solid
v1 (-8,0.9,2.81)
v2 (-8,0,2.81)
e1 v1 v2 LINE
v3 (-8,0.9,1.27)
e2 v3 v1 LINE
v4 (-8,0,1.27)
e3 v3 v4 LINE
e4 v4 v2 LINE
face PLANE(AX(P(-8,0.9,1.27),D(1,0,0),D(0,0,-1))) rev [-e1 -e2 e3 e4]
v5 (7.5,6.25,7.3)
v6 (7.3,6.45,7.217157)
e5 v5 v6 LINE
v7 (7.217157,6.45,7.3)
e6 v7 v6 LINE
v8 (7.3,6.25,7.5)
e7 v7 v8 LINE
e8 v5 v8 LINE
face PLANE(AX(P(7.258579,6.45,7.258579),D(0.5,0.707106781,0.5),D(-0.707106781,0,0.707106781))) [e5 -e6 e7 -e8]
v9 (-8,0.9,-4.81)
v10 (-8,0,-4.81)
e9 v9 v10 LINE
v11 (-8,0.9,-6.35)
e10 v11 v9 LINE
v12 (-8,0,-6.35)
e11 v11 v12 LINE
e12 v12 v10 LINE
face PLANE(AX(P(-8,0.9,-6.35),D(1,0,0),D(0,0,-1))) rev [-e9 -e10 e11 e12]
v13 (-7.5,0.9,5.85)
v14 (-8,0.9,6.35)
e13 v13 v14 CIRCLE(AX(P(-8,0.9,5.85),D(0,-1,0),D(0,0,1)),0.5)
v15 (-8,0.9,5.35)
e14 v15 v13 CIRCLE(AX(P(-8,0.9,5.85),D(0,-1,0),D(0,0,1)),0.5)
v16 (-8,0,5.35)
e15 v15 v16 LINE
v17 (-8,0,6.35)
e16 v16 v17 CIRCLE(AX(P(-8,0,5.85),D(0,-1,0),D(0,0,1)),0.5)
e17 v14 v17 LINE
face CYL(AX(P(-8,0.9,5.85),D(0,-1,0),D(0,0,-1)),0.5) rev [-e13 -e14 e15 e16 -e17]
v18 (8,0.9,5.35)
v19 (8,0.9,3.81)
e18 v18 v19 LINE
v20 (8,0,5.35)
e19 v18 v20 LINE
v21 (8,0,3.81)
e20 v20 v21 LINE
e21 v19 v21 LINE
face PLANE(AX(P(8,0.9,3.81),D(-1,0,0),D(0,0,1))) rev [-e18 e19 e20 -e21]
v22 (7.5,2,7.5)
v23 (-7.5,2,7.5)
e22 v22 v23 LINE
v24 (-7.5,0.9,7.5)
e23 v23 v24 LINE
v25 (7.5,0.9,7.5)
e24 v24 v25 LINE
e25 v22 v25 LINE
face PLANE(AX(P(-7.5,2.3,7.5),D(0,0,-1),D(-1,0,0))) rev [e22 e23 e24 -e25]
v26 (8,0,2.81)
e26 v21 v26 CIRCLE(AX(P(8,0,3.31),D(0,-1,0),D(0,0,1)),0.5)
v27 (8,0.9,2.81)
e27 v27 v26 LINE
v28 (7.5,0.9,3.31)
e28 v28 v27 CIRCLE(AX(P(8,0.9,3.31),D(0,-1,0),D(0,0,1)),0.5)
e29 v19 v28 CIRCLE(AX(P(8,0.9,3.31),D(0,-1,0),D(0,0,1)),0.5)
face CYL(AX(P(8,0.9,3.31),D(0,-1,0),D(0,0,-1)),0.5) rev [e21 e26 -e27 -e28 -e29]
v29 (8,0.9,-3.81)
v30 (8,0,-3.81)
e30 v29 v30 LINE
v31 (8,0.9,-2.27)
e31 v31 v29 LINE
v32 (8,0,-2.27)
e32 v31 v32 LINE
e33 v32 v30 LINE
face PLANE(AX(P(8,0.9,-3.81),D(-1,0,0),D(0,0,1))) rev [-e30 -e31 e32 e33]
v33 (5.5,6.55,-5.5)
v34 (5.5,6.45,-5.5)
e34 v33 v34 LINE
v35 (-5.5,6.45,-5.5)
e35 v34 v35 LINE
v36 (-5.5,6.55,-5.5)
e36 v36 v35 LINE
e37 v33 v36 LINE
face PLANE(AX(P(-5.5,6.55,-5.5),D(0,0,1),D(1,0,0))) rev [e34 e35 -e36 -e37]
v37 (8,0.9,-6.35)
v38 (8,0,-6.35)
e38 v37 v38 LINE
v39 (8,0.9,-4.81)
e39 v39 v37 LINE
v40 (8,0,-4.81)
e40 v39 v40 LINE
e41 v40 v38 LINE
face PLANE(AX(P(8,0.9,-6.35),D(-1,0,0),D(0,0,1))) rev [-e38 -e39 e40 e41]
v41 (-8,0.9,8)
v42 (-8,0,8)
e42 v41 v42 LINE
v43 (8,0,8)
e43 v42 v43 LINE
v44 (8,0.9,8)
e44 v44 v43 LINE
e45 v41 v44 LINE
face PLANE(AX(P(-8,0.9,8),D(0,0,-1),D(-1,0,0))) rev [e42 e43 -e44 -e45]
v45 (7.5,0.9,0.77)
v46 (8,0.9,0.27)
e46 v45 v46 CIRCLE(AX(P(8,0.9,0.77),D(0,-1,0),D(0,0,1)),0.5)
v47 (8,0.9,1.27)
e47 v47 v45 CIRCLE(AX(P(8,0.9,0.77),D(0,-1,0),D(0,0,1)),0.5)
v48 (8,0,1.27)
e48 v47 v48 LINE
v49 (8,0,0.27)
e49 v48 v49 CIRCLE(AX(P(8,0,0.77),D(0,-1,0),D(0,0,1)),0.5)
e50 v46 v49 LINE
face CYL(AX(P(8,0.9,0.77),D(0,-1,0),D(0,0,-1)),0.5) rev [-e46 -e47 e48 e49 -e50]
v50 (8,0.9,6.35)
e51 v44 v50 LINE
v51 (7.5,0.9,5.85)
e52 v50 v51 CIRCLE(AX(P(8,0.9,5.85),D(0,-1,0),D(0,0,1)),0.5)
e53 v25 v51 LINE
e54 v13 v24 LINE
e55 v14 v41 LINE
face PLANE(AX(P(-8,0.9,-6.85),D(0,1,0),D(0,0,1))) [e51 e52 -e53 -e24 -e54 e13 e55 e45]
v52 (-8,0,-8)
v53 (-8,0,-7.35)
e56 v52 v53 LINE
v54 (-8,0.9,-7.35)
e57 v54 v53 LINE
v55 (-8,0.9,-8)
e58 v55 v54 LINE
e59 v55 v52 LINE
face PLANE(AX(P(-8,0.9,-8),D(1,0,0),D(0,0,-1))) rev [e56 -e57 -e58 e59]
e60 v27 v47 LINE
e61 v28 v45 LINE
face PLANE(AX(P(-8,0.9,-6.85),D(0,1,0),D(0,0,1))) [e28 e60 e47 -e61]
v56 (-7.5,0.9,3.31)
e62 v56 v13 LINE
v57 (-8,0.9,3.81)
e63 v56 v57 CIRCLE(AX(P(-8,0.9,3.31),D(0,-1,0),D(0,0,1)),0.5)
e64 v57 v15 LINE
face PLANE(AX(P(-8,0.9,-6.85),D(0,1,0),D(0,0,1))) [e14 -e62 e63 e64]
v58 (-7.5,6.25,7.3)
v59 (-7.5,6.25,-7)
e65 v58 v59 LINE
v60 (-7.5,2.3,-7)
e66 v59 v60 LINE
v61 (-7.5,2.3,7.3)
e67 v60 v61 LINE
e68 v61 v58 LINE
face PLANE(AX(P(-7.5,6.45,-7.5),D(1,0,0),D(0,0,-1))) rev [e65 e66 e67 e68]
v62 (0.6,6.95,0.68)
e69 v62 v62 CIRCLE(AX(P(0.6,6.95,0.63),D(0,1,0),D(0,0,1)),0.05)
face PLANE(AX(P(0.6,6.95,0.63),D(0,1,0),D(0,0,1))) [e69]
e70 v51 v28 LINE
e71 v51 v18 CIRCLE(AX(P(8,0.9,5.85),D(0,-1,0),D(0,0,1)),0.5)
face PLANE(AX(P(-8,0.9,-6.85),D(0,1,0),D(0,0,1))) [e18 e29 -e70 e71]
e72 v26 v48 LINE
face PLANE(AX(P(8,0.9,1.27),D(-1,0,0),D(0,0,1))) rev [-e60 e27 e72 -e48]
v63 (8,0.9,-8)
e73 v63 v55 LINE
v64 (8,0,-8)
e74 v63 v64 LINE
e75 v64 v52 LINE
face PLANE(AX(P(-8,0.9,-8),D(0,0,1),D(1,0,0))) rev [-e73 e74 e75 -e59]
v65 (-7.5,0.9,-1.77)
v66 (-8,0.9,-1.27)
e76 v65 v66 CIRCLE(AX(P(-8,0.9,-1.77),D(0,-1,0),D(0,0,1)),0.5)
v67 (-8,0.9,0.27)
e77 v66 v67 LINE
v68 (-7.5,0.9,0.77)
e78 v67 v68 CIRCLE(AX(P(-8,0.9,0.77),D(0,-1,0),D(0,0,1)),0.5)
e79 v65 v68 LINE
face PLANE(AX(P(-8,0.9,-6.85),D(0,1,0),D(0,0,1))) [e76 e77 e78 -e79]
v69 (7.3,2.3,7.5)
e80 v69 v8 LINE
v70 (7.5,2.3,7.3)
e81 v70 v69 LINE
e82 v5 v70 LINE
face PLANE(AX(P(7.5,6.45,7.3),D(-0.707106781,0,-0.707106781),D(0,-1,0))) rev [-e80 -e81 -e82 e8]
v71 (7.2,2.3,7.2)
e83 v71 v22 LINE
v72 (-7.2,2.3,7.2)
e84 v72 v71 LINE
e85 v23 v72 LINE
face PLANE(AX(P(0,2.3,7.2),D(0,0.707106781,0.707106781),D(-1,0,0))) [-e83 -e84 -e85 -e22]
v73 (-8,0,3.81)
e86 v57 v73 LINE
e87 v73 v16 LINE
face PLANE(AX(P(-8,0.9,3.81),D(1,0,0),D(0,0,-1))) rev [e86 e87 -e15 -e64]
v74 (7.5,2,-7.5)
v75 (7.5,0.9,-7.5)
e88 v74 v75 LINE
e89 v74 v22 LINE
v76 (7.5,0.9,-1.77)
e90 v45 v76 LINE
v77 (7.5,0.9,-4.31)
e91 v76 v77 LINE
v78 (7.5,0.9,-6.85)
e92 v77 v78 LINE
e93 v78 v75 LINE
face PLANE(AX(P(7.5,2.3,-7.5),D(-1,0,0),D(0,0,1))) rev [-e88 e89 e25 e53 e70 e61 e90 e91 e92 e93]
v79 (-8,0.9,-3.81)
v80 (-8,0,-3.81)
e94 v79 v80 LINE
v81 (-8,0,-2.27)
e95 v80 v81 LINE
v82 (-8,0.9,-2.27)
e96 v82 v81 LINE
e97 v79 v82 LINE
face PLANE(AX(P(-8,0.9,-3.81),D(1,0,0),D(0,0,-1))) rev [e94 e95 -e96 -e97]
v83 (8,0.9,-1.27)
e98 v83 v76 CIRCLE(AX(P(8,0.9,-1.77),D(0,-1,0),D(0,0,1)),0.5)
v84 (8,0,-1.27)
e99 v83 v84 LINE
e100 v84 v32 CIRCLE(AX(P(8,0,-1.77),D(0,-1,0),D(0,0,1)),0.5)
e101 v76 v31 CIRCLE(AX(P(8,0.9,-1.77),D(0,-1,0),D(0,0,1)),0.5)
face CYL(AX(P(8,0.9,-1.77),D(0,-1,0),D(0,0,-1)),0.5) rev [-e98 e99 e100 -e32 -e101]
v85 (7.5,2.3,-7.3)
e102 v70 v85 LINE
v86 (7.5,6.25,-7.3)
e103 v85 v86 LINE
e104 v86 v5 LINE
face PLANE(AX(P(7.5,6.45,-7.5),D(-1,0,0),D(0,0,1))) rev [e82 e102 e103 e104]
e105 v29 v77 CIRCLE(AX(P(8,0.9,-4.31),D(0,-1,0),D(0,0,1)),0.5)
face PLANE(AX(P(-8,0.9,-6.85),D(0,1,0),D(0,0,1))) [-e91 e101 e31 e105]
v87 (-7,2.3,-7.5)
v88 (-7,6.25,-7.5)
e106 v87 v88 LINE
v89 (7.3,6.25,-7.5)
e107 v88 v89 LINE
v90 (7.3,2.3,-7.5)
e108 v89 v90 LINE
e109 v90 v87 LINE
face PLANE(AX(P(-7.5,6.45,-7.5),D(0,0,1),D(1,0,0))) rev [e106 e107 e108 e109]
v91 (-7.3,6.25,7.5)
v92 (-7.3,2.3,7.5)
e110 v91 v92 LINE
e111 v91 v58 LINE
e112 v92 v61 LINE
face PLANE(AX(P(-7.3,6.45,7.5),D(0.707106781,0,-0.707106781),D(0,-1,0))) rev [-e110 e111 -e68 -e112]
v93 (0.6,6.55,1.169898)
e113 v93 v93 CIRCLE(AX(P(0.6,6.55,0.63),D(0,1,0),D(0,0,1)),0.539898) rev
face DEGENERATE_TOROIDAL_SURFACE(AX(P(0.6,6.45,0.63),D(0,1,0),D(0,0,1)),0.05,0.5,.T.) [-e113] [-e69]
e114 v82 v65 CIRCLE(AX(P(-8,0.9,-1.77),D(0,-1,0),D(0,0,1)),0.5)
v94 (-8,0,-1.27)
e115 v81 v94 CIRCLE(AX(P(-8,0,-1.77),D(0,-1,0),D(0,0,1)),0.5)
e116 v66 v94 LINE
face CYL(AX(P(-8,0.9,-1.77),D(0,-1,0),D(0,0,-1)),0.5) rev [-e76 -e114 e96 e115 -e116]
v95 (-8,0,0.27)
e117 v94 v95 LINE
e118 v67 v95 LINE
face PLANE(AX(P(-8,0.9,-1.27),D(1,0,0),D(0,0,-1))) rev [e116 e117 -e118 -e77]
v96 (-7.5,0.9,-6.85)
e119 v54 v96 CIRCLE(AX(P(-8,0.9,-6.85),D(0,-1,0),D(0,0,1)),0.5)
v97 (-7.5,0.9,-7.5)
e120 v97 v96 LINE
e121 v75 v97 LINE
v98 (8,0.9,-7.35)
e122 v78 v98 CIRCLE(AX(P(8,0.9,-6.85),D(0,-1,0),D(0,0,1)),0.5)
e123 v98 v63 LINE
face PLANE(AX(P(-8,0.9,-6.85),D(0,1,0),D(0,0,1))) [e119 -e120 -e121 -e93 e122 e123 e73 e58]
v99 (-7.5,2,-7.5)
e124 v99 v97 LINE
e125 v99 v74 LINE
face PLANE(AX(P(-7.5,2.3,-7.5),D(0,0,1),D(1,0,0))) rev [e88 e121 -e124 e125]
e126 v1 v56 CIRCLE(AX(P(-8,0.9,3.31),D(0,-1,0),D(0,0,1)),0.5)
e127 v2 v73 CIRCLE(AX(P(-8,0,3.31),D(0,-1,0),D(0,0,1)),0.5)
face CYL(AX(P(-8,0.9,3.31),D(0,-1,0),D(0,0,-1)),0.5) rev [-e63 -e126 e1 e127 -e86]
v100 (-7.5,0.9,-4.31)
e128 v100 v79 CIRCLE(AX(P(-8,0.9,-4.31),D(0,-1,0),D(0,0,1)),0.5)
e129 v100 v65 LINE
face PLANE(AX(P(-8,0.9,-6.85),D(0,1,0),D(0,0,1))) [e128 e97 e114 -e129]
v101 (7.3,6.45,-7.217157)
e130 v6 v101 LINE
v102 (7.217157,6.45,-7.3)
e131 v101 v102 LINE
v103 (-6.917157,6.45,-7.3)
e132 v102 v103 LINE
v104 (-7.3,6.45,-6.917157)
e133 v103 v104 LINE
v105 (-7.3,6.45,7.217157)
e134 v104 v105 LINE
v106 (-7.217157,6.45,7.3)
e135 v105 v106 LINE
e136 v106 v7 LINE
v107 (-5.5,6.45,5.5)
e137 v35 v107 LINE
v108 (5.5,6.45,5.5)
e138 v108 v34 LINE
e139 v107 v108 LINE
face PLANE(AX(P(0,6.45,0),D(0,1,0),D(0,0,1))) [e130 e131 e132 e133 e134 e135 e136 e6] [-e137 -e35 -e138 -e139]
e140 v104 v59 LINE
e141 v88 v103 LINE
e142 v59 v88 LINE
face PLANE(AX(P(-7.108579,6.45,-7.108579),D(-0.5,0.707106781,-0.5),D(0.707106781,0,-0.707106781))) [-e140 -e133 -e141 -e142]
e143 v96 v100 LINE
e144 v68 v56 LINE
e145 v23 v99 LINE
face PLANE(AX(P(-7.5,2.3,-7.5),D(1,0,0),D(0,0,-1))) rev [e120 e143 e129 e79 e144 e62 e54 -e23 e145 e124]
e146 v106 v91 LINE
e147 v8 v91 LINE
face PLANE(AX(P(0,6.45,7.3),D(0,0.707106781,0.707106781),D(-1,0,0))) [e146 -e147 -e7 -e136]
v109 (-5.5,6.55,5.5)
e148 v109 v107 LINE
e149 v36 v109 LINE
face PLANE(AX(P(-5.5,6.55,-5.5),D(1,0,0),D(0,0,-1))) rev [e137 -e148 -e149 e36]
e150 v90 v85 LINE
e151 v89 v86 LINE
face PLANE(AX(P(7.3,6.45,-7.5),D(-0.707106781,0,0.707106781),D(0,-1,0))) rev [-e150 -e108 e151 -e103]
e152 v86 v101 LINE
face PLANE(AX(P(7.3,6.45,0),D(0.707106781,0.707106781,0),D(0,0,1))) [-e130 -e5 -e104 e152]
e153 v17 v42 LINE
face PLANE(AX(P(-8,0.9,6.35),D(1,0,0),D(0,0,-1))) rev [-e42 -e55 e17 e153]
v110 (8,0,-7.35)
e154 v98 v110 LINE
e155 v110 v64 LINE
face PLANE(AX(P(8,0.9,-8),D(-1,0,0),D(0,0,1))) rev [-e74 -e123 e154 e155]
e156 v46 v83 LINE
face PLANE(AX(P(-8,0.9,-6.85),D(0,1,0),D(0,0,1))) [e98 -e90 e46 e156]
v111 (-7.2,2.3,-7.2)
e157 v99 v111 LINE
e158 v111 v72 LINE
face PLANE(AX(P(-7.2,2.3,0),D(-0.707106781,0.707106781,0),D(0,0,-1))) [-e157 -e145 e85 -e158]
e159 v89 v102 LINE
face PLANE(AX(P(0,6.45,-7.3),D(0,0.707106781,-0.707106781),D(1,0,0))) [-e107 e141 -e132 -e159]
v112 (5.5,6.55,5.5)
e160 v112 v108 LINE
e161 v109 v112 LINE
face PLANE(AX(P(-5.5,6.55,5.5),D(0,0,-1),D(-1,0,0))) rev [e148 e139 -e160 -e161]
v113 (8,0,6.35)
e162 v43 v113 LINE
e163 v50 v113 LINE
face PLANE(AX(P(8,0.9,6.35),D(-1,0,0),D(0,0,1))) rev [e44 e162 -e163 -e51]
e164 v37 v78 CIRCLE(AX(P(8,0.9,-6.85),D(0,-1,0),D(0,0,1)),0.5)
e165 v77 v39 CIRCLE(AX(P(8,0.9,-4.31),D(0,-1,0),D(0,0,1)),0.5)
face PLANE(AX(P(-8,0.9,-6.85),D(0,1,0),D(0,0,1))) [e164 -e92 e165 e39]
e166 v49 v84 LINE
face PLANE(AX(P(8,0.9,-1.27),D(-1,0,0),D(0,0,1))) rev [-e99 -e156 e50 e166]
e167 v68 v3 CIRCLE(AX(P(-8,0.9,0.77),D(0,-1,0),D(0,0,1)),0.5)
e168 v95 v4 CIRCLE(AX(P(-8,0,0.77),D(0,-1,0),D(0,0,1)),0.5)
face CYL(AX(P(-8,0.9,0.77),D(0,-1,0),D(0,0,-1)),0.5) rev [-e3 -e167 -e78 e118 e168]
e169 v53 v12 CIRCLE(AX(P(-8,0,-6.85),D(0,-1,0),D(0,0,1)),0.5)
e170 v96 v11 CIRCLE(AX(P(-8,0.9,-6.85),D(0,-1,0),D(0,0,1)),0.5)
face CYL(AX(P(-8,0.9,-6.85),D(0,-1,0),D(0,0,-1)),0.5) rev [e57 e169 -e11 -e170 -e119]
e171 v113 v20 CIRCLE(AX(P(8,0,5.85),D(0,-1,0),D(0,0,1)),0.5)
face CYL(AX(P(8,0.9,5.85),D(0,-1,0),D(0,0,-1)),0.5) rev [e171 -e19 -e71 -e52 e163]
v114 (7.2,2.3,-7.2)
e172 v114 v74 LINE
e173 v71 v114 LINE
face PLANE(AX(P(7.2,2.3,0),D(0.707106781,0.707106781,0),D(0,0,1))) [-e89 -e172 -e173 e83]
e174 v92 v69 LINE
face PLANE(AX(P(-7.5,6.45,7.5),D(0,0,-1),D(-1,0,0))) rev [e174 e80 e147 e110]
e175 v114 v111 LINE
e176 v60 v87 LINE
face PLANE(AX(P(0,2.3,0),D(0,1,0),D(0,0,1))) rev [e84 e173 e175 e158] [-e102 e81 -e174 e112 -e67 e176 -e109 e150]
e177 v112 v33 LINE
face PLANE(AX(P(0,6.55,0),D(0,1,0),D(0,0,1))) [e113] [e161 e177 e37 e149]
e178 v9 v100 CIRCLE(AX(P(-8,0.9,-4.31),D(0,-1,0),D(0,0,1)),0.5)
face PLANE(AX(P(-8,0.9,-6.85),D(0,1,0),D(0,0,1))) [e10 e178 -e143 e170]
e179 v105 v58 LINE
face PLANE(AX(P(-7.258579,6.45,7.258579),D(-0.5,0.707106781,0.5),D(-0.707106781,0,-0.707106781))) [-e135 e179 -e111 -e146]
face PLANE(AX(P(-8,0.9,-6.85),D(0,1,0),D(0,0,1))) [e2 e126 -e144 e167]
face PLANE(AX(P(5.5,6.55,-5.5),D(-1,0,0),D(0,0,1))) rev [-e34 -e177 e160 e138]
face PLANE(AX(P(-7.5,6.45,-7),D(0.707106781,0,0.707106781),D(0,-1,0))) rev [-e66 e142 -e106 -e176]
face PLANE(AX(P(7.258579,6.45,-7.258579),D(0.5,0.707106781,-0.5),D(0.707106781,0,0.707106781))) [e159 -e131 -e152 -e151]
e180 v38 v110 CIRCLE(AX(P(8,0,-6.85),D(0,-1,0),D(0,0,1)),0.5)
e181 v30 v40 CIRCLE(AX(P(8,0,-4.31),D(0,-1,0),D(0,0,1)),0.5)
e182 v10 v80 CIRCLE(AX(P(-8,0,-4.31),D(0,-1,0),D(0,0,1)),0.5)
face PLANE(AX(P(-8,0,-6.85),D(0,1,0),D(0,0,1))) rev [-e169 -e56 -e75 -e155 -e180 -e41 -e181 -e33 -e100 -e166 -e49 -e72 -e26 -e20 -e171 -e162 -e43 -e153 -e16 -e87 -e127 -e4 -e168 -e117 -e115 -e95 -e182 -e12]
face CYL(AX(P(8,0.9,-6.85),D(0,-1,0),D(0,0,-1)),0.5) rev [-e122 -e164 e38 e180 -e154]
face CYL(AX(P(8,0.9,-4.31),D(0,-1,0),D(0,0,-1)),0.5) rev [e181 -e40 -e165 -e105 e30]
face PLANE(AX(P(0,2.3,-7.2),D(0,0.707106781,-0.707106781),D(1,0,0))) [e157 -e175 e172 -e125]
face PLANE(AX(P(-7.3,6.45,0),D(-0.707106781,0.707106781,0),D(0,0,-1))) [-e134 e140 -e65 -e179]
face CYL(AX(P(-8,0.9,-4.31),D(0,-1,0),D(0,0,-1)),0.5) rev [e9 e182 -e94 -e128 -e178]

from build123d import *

# Parameters (mm, degrees)
EXTRUDE1_DEPTH = 0.9
SKETCH2_W      = 15
SKETCH2_H      = 15
EXTRUDE2_DEPTH = 1.4
CHAMFER1_SIZE  = 0.3
SKETCH3_W      = 15
SKETCH3_H      = 15
EXTRUDE3_DEPTH = 4.15
CHAMFER2_SIZE  = 0.5
CHAMFER3_SIZE  = 0.2
CHAMFER4_SIZE  = 0.2
SKETCH4_R      = 0.55
EXTRUDE4_DEPTH = 0.5
FILLET1_R      = 0.5
SKETCH5_W      = 11
SKETCH5_H      = 11
EXTRUDE5_DEPTH = 0.1


with BuildPart() as part:
    # Sketch1 → Extrude1 (new body)
    with BuildSketch(Plane(origin=(0, 0, 0), x_dir=(1, 0, 0), z_dir=(0, 1, 0))):
        with BuildLine():
            Line((8, 6.35), (8, 4.81))
            ThreePointArc((8, 4.81), (7.5, 4.31), (8, 3.81))
            Line((8, 3.81), (8, 2.27))
            ThreePointArc((8, 2.27), (7.5, 1.77), (8, 1.27))
            Line((8, 1.27), (8, -0.27))
            ThreePointArc((8, -0.27), (7.5, -0.77), (8, -1.27))
            Line((8, -1.27), (8, -2.81))
            ThreePointArc((8, -2.81), (7.5, -3.31), (8, -3.81))
            Line((8, -3.81), (8, -5.35))
            ThreePointArc((8, -5.35), (7.5, -5.85), (8, -6.35))
            Line((8, -6.35), (8, -8))
            Line((8, -8), (-8, -8))
            Line((-8, -8), (-8, -6.35))
            ThreePointArc((-8, -6.35), (-7.5, -5.85), (-8, -5.35))
            Line((-8, -5.35), (-8, -3.81))
            ThreePointArc((-8, -3.81), (-7.5, -3.31), (-8, -2.81))
            Line((-8, -2.81), (-8, -1.27))
            ThreePointArc((-8, -1.27), (-7.5, -0.77), (-8, -0.27))
            Line((-8, -0.27), (-8, 1.27))
            ThreePointArc((-8, 1.27), (-7.5, 1.77), (-8, 2.27))
            Line((-8, 2.27), (-8, 3.81))
            ThreePointArc((-8, 3.81), (-7.5, 4.31), (-8, 4.81))
            Line((-8, 4.81), (-8, 6.35))
            ThreePointArc((-8, 6.35), (-7.5, 6.85), (-8, 7.35))
            Line((-8, 7.35), (-8, 8))
            Line((-8, 8), (8, 8))
            Line((8, 8), (8, 7.35))
            ThreePointArc((8, 7.35), (7.5, 6.85), (8, 6.35))
        make_face()
    extrude(amount=EXTRUDE1_DEPTH)

    # Sketch2 → Extrude2 (add)
    with BuildSketch(Plane(origin=(0, 0.9, 0), x_dir=(1, 0, 0), z_dir=(0, 1, 0))):
        Rectangle(SKETCH2_W, SKETCH2_H)
    extrude(amount=EXTRUDE2_DEPTH)

    # Chamfer1
    chamfer1_edges = [part.edges().sort_by_distance(p)[0] for p in [
        (-7.5, 2.3, 0),
        (0, 2.3, 7.5),
        (7.5, 2.3, 0),
        (0, 2.3, -7.5),
    ]]
    chamfer(chamfer1_edges, length=CHAMFER1_SIZE)

    # Sketch3 → Extrude3 (add)
    with BuildSketch(Plane(origin=(0, 2.3, 0), x_dir=(1, 0, 0), z_dir=(0, 1, 0))):
        Rectangle(SKETCH3_W, SKETCH3_H)
    extrude(amount=EXTRUDE3_DEPTH)

    # Chamfer2
    chamfer2_edges = [part.edges().sort_by_distance(p)[0] for p in [
        (-7.5, 4.375, -7.5),
    ]]
    chamfer(chamfer2_edges, length=CHAMFER2_SIZE)

    # Chamfer3
    chamfer3_edges = [part.edges().sort_by_distance(p)[0] for p in [
        (-7.5, 4.375, 7.5),
        (7.5, 4.375, 7.5),
        (7.5, 4.375, -7.5),
    ]]
    chamfer(chamfer3_edges, length=CHAMFER3_SIZE)

    # Chamfer4
    chamfer4_edges = [part.edges().sort_by_distance(p)[0] for p in [
        (-7.5, 6.45, 0.15),
        (-7.25, 6.45, -7.25),
        (0.15, 6.45, -7.5),
        (7.5, 6.45, 0),
        (0, 6.45, 7.5),
        (-7.4, 6.45, 7.4),
        (7.4, 6.45, 7.4),
        (7.4, 6.45, -7.4),
    ]]
    chamfer(chamfer4_edges, length=CHAMFER4_SIZE)

    # Sketch4 → Extrude4 (add)
    with BuildSketch(Plane(origin=(0, 6.45, 0), x_dir=(1, 0, 0), z_dir=(0, 1, 0))):
        with Locations(Location((0.6, -0.63, 0), (0, 0, 270))):
            Circle(SKETCH4_R)
    extrude(amount=EXTRUDE4_DEPTH)

    # Fillet1
    fillet1_edges = [part.edges().sort_by_distance(p)[0] for p in [
        (0.6, 6.95, 0.08),
    ]]
    fillet(fillet1_edges, radius=FILLET1_R - 0.0001)  # a hair under: the kernel refuses the full size

    # Sketch5 → Extrude5 (add)
    with BuildSketch(Plane(origin=(0, 6.45, 0), x_dir=(1, 0, 0), z_dir=(0, 1, 0))):
        Rectangle(SKETCH5_W, SKETCH5_H)
    extrude(amount=EXTRUDE5_DEPTH)


solid = part.part
